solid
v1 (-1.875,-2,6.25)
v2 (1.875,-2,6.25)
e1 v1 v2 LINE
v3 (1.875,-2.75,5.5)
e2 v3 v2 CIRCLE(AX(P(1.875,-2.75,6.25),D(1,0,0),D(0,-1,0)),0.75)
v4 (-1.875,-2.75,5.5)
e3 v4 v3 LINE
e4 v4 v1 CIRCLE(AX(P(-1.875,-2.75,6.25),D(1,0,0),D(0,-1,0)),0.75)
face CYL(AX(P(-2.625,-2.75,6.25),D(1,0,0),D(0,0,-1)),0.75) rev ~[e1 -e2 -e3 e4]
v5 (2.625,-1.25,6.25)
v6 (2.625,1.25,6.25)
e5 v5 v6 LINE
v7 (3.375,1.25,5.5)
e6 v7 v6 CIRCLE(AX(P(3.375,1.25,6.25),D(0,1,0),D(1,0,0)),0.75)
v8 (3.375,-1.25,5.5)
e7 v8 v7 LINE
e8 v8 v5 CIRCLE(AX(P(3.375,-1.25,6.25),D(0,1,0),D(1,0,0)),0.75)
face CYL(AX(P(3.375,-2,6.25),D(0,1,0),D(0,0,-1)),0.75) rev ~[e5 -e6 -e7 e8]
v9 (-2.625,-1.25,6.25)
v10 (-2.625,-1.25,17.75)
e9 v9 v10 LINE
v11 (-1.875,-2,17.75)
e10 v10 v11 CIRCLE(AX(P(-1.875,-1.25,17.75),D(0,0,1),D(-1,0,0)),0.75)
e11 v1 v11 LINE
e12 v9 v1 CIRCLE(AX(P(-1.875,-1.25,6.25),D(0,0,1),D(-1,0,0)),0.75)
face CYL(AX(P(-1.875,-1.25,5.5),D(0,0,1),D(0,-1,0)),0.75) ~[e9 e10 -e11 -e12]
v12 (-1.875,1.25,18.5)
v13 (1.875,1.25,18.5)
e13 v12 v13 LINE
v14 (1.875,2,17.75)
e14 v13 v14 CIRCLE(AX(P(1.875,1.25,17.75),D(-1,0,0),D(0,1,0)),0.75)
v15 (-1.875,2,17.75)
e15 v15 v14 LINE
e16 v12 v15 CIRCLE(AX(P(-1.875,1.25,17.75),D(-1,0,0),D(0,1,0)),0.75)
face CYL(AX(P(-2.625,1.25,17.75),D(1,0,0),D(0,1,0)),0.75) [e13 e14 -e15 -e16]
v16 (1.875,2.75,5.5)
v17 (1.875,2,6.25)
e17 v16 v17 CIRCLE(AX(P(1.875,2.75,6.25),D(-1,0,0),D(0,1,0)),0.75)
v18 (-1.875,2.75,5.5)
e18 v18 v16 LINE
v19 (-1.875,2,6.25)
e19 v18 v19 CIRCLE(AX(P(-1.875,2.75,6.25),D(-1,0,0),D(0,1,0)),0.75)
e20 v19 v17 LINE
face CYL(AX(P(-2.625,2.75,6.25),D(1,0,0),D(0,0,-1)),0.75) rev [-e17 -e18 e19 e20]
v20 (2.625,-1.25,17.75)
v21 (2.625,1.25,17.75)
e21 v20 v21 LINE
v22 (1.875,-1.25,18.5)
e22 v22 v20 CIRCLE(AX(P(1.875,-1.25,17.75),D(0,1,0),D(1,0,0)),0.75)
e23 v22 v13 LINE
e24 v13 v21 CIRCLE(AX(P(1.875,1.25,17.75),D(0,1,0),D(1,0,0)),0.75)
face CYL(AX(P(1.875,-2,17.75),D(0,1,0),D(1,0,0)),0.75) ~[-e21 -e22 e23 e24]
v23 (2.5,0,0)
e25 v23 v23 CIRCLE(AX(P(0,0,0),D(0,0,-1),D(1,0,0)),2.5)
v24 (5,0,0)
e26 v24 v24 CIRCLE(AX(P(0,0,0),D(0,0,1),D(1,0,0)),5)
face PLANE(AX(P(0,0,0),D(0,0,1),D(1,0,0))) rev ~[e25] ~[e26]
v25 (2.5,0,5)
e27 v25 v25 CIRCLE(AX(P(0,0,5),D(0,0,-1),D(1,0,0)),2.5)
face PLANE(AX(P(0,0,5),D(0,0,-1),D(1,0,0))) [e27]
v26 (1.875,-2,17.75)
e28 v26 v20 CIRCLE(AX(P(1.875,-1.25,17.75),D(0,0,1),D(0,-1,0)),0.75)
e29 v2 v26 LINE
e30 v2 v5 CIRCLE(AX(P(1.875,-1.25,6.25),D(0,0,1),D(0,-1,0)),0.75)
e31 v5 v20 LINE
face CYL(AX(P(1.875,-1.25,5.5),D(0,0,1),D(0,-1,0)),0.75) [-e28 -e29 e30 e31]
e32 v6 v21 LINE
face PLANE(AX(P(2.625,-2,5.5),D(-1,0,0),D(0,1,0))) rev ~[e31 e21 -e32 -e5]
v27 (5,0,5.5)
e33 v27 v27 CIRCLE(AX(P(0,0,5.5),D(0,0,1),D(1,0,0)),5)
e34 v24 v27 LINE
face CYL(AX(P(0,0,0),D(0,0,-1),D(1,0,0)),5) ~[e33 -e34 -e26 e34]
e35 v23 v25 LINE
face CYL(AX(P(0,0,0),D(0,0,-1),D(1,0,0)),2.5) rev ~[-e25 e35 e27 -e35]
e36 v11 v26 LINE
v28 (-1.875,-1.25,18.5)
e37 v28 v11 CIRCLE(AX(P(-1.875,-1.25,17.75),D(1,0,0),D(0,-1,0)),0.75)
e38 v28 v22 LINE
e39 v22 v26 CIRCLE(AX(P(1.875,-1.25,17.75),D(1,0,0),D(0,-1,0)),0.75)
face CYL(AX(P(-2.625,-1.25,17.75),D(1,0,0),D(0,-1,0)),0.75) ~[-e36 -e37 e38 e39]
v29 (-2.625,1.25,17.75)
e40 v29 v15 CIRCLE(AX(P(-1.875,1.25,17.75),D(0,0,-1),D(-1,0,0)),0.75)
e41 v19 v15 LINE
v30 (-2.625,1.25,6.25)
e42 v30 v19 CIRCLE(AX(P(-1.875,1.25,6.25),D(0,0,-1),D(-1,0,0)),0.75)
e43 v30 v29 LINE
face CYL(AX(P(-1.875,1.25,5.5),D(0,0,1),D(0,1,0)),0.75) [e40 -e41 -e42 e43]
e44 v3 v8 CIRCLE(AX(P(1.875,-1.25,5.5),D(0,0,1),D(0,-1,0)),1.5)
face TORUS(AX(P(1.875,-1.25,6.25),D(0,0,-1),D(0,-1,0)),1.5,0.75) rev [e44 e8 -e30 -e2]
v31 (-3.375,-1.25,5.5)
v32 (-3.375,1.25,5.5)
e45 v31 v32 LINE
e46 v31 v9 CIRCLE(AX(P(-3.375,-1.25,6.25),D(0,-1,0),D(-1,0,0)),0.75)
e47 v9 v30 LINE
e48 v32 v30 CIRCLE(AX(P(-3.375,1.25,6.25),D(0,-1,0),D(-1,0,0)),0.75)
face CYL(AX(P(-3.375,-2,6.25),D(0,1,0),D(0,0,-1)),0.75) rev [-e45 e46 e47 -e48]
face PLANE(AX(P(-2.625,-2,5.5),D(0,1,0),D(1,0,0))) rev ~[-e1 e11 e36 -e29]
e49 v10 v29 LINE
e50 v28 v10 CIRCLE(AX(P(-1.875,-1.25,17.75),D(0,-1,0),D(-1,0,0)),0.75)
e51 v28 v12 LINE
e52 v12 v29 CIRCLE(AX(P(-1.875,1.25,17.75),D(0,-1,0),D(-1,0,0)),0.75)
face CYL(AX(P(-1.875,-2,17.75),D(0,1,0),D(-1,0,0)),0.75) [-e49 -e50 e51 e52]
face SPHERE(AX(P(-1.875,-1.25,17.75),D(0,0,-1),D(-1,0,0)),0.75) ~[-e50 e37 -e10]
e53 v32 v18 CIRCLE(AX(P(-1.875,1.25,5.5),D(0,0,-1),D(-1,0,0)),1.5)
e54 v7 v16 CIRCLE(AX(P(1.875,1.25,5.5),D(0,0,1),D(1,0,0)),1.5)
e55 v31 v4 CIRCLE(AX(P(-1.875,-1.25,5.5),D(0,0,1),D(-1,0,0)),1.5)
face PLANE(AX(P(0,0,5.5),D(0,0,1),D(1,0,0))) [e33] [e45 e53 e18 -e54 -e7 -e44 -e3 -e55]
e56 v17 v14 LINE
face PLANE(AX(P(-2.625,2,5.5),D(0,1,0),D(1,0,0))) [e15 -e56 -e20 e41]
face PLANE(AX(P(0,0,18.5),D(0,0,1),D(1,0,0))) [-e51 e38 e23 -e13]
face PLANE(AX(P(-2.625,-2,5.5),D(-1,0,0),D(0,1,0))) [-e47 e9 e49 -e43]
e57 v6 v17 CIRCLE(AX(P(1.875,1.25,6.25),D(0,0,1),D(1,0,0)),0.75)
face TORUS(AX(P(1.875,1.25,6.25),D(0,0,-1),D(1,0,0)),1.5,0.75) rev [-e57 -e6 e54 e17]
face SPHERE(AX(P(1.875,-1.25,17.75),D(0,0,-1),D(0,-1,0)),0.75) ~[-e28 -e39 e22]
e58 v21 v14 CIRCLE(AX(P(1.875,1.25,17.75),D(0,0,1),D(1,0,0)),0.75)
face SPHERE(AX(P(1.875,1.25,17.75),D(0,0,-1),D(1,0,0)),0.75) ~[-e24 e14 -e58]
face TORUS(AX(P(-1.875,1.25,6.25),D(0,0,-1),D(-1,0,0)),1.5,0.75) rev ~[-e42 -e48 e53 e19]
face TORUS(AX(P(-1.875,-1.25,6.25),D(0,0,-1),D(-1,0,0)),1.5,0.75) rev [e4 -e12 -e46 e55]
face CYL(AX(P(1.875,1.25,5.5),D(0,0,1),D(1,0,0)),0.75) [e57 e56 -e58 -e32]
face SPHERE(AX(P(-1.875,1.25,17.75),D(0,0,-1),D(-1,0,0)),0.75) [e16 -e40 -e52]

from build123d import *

# Parameters (mm, degrees)
F0_R     = 5
F1_DEPTH = 5.5
F2_W     = 5.25
F2_H     = 4
F3_DEPTH = 13
F4_R     = 0.75
F5_R     = 2.5
F6_DEPTH = 5


with BuildPart() as f1:
    # F0 (on Top) → F1 (new body)
    with BuildSketch(Plane.XY):
        Circle(F0_R)
    extrude(amount=F1_DEPTH)

    # F2 (on face) → F3 (join)
    with BuildSketch(Plane.XY.offset(5.5)):
        Rectangle(F2_W, F2_H)
    extrude(amount=F3_DEPTH)

    # F4
    f4_edges = [f1.edges().sort_by_distance(p)[0] for p in [
        (-2.625, -2, 12),
        (2.625, -2, 12),
        (2.625, 2, 12),
        (-2.625, 2, 12),
        (-2.625, 0, 5.5),
        (-2.625, 0, 18.5),
        (0, -2, 18.5),
        (2.625, 0, 18.5),
        (0, 2, 18.5),
        (0, -2, 5.5),
        (2.625, 0, 5.5),
        (0, 2, 5.5),
    ]]
    fillet(f4_edges, radius=F4_R)

    # F5 (on face) → F6 (cut)
    with BuildSketch(Plane(origin=(0, 0, 0), x_dir=(1, 0, 0), z_dir=(0, 0, -1))):
        Circle(F5_R)
    extrude(amount=-F6_DEPTH, mode=Mode.SUBTRACT)


solid = f1.part
